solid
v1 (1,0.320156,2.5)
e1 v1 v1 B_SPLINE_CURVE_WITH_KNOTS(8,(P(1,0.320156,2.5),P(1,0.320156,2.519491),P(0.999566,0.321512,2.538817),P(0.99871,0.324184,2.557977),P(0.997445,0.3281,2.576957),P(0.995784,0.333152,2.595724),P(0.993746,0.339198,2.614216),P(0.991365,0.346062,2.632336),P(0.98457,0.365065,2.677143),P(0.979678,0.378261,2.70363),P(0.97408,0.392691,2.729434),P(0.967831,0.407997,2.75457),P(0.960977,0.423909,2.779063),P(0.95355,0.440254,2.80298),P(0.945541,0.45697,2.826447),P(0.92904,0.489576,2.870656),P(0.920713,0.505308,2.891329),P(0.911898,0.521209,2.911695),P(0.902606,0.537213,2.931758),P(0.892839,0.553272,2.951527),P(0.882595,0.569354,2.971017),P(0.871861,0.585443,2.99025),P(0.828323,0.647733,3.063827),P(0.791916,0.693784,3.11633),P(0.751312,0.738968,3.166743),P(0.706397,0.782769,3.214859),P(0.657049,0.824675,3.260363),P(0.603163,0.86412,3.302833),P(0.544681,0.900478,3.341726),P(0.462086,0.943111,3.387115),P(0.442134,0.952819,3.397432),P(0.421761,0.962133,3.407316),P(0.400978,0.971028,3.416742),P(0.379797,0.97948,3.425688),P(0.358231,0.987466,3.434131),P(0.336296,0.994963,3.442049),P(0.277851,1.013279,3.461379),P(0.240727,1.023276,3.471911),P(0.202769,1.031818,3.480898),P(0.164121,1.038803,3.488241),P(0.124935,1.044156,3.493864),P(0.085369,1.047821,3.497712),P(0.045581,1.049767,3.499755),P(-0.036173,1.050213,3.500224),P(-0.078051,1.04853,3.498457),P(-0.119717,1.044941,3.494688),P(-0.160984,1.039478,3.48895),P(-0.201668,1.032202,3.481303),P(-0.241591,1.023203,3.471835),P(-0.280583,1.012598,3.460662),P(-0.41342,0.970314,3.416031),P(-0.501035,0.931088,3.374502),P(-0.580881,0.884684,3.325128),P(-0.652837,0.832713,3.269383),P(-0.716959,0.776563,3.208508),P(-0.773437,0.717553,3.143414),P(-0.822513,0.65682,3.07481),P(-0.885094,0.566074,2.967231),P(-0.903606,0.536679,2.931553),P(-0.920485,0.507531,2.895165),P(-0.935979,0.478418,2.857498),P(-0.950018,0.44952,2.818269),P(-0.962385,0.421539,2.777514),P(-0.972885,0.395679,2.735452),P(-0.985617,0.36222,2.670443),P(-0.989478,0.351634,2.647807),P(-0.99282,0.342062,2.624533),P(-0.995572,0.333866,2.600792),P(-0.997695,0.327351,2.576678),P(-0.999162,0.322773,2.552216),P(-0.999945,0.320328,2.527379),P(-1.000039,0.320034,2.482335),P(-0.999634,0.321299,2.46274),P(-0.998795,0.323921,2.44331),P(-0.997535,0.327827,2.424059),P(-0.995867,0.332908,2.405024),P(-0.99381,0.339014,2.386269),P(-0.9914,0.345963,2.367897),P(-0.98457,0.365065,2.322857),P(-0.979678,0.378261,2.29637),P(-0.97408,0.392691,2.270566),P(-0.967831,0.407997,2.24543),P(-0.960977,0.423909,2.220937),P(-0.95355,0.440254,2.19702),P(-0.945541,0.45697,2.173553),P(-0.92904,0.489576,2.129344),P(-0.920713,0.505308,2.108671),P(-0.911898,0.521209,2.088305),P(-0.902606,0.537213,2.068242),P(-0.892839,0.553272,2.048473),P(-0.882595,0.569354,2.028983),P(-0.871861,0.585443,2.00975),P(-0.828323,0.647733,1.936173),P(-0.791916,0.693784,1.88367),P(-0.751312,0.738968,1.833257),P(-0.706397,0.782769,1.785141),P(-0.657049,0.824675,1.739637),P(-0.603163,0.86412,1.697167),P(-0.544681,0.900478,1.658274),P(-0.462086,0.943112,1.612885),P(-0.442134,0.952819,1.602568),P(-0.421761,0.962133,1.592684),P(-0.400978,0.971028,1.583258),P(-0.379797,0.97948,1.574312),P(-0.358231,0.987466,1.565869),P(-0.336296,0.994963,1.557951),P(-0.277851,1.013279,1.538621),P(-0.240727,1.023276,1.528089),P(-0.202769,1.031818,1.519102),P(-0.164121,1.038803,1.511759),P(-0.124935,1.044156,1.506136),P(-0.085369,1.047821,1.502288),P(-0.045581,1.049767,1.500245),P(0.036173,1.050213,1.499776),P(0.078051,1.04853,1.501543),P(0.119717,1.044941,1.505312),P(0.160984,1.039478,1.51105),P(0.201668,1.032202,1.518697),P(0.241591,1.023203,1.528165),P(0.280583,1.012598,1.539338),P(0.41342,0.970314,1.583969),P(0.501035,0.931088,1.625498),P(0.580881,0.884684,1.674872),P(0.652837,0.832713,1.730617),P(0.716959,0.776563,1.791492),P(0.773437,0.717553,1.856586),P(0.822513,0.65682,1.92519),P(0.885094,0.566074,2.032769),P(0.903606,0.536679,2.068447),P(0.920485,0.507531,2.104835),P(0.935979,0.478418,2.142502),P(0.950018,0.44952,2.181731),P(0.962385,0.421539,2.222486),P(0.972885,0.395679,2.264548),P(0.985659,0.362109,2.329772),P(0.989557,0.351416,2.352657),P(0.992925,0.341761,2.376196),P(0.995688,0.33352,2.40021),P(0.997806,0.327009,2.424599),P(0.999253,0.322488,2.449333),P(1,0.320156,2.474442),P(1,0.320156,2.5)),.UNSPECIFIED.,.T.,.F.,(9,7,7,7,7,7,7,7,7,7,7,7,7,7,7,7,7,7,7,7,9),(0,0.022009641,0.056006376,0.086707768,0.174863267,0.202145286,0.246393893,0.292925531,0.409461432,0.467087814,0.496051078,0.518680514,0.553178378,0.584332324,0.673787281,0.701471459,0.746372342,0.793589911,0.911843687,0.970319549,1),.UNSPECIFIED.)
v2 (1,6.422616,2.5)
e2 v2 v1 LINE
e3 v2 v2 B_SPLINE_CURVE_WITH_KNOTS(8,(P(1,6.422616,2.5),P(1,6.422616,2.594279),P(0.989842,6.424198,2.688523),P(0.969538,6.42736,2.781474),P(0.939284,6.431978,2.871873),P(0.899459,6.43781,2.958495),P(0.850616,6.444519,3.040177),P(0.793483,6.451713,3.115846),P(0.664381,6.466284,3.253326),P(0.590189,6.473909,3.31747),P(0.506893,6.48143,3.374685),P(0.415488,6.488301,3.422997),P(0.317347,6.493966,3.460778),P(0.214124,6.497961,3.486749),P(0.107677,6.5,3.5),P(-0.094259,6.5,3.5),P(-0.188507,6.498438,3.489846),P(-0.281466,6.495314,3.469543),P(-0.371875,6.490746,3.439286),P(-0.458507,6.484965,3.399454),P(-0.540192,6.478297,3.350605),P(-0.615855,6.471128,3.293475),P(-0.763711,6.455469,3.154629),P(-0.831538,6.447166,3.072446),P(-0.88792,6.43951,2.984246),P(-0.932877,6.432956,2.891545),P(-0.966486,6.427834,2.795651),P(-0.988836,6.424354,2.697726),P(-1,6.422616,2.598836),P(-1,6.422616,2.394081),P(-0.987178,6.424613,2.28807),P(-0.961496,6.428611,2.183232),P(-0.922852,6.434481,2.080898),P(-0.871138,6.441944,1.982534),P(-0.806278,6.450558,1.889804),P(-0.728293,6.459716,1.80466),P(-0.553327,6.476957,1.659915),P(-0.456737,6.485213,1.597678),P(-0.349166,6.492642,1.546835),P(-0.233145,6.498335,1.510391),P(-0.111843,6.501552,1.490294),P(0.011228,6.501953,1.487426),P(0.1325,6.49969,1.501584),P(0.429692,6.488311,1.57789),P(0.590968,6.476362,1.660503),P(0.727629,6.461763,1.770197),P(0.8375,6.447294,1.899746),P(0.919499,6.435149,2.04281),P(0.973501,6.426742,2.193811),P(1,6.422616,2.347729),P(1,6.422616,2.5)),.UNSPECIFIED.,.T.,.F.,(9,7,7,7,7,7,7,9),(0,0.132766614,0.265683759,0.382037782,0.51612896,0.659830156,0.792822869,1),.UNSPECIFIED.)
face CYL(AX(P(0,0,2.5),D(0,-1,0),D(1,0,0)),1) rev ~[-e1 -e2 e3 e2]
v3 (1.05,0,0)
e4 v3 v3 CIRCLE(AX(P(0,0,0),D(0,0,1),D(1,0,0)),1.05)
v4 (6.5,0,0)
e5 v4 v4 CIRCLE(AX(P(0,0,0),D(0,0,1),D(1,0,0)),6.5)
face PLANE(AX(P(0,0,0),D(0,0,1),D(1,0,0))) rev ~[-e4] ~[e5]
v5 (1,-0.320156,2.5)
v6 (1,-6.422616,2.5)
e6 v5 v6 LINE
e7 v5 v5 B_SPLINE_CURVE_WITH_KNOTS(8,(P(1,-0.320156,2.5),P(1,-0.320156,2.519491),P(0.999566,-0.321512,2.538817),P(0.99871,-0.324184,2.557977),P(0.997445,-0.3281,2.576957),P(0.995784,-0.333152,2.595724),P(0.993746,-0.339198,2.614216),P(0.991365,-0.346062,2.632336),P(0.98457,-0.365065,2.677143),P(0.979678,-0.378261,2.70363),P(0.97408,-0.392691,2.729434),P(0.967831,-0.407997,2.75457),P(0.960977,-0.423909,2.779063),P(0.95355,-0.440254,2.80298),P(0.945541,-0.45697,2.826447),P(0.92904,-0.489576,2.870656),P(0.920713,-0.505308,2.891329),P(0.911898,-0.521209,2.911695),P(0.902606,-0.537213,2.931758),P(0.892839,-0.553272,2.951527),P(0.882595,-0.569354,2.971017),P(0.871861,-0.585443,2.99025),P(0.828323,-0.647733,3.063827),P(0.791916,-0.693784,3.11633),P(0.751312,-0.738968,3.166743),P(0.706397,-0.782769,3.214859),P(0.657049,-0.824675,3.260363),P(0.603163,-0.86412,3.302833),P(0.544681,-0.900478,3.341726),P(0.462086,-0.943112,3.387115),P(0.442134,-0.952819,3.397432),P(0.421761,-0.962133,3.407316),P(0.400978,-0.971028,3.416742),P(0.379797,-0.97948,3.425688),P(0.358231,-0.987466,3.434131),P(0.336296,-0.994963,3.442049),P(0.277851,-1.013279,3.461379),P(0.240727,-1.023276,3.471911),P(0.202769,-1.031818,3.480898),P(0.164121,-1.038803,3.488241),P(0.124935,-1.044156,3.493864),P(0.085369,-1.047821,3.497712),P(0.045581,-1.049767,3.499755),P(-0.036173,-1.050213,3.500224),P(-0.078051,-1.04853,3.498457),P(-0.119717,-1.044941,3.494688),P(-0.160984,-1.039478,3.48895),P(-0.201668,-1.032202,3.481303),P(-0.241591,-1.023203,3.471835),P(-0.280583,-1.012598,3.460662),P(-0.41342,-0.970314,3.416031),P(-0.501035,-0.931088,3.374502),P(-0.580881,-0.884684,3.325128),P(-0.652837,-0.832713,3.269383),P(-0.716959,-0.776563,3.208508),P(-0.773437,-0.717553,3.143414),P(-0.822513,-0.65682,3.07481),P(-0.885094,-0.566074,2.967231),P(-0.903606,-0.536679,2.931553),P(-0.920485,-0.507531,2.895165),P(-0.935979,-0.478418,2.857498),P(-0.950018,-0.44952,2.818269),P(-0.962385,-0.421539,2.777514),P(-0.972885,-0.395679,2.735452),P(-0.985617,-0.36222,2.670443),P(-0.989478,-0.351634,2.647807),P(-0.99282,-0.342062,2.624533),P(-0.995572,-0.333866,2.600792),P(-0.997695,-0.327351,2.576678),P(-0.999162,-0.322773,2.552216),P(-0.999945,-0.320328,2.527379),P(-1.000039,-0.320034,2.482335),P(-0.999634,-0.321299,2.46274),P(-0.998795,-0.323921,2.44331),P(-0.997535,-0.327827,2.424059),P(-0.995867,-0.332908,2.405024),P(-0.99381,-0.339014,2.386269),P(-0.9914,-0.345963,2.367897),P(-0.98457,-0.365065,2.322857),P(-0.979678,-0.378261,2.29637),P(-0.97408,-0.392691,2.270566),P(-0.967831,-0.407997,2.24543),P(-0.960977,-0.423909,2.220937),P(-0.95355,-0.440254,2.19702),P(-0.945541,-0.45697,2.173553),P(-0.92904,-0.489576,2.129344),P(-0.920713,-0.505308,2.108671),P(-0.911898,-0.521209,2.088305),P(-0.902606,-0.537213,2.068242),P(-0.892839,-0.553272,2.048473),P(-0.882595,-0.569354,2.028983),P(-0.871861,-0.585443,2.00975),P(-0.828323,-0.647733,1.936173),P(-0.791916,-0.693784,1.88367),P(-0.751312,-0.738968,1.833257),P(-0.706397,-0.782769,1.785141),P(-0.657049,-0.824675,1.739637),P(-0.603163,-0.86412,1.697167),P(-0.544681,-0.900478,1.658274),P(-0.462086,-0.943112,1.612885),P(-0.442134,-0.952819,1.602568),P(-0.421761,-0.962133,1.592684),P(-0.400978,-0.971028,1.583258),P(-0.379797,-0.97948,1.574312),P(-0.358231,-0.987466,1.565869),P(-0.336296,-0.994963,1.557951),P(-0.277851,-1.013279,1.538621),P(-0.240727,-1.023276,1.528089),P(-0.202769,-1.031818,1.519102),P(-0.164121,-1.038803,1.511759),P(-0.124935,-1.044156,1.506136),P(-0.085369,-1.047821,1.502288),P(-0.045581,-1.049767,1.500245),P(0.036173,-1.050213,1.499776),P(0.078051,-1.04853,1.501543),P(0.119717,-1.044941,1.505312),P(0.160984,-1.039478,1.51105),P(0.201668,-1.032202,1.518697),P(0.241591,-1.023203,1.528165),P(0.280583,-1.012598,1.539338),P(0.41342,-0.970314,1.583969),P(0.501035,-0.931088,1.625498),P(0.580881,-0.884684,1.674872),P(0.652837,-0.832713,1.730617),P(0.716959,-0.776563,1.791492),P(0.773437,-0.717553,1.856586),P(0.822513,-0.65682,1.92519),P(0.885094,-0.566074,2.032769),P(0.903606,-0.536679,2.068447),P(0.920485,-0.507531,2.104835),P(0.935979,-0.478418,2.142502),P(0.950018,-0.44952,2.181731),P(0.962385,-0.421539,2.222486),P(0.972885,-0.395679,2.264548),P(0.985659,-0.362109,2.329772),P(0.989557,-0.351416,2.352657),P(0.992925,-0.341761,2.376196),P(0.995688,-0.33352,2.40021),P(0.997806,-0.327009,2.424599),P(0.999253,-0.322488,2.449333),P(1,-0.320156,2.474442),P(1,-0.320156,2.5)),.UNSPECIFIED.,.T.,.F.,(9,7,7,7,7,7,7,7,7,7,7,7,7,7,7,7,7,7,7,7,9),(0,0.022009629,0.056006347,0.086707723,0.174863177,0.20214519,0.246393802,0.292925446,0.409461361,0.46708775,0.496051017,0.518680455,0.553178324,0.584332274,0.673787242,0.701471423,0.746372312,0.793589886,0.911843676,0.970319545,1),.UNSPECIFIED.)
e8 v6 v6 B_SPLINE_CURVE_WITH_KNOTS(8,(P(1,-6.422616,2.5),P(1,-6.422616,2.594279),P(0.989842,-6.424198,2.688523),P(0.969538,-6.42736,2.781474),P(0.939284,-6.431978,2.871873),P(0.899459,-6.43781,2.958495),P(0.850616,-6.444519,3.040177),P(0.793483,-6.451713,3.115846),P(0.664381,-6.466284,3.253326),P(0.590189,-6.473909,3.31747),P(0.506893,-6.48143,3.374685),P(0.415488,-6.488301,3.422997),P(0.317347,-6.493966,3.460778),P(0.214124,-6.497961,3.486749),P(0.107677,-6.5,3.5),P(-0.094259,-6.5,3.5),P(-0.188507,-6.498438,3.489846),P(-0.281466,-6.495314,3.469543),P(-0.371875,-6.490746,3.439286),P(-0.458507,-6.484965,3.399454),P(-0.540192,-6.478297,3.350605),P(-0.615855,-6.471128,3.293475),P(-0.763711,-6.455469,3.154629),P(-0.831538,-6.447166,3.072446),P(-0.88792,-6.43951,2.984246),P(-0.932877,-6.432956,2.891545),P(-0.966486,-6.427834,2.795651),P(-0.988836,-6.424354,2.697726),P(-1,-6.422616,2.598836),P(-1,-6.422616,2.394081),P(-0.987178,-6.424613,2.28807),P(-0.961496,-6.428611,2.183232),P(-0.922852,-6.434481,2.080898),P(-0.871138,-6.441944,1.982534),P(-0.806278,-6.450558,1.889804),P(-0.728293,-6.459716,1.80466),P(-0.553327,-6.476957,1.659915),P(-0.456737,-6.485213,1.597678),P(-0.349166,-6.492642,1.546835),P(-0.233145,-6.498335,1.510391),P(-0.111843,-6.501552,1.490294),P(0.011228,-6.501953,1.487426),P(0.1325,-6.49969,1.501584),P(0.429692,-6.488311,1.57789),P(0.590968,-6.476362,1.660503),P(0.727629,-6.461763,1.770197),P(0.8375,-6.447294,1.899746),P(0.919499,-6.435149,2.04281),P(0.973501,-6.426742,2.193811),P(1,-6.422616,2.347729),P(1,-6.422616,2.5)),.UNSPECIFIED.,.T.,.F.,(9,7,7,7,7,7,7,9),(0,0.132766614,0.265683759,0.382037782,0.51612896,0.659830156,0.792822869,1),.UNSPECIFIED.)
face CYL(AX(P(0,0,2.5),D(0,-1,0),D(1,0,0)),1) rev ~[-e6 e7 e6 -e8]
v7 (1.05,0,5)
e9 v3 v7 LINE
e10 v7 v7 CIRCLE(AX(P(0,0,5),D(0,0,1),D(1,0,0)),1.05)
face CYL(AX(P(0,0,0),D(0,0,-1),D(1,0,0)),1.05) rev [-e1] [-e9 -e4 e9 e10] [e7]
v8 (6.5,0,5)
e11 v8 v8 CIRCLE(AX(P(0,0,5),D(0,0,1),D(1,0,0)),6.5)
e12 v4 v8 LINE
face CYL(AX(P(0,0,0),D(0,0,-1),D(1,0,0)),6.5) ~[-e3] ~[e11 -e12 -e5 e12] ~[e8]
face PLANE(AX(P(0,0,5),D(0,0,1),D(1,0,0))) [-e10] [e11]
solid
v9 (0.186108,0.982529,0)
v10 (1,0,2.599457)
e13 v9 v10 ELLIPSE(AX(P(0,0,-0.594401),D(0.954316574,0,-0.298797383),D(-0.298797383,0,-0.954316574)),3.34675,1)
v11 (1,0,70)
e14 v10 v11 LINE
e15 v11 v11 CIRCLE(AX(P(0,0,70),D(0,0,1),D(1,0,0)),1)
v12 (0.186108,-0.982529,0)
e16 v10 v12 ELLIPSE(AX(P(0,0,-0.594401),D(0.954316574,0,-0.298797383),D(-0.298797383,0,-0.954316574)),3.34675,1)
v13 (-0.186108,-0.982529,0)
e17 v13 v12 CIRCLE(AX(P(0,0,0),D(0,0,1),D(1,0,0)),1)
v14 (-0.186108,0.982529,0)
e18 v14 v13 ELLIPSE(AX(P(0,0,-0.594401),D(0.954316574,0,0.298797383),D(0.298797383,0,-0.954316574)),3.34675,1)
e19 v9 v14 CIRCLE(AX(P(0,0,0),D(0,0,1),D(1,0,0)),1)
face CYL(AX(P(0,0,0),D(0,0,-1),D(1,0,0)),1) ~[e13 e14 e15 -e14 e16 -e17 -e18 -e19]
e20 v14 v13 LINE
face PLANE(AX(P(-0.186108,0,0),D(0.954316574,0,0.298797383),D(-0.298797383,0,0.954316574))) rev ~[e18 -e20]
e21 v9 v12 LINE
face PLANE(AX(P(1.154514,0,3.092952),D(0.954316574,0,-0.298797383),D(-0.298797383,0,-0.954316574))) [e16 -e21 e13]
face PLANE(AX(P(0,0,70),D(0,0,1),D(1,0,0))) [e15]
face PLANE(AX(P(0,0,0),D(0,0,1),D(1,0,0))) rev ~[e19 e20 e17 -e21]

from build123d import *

# Parameters (mm, degrees)
F0_R     = 1
F1_DEPTH = 70
F3_DEPTH = 12.5
F4_R     = 6.5
F4_R_2   = 1.05
F5_DEPTH = 5
F6_R     = 1
F7_DEPTH = 12.5


with BuildPart() as f1:
    # F0 (on Top) → F1 (new body)
    with BuildSketch(Plane.XY):
        Circle(F0_R)
    extrude(amount=F1_DEPTH)

    # F2 (on Front) → F3 (cut, symmetric)
    with BuildSketch(Plane.XZ):
        Polygon((1.154513564, 3.092951607), (0.1861076162, 0), (1.154513564, 0), align=None)
        Polygon((-1.154513564, 0), (-0.1861076162, 0), (-1.154513564, 3.092951607), align=None)
    extrude(amount=F3_DEPTH, both=True, mode=Mode.SUBTRACT)


with BuildPart() as f5:
    # F4 (on Top) → F5 (new body)
    with BuildSketch(Plane.XY):
        Circle(F4_R)
        Circle(F4_R_2, mode=Mode.SUBTRACT)
    extrude(amount=F5_DEPTH)

    # F6 (on Front) → F7 (cut, symmetric)
    with BuildSketch(Plane.XZ):
        with Locations((0, 2.5)):
            Circle(F6_R)
    extrude(amount=F7_DEPTH, both=True, mode=Mode.SUBTRACT)


solid = Compound([f1.part, f5.part])
